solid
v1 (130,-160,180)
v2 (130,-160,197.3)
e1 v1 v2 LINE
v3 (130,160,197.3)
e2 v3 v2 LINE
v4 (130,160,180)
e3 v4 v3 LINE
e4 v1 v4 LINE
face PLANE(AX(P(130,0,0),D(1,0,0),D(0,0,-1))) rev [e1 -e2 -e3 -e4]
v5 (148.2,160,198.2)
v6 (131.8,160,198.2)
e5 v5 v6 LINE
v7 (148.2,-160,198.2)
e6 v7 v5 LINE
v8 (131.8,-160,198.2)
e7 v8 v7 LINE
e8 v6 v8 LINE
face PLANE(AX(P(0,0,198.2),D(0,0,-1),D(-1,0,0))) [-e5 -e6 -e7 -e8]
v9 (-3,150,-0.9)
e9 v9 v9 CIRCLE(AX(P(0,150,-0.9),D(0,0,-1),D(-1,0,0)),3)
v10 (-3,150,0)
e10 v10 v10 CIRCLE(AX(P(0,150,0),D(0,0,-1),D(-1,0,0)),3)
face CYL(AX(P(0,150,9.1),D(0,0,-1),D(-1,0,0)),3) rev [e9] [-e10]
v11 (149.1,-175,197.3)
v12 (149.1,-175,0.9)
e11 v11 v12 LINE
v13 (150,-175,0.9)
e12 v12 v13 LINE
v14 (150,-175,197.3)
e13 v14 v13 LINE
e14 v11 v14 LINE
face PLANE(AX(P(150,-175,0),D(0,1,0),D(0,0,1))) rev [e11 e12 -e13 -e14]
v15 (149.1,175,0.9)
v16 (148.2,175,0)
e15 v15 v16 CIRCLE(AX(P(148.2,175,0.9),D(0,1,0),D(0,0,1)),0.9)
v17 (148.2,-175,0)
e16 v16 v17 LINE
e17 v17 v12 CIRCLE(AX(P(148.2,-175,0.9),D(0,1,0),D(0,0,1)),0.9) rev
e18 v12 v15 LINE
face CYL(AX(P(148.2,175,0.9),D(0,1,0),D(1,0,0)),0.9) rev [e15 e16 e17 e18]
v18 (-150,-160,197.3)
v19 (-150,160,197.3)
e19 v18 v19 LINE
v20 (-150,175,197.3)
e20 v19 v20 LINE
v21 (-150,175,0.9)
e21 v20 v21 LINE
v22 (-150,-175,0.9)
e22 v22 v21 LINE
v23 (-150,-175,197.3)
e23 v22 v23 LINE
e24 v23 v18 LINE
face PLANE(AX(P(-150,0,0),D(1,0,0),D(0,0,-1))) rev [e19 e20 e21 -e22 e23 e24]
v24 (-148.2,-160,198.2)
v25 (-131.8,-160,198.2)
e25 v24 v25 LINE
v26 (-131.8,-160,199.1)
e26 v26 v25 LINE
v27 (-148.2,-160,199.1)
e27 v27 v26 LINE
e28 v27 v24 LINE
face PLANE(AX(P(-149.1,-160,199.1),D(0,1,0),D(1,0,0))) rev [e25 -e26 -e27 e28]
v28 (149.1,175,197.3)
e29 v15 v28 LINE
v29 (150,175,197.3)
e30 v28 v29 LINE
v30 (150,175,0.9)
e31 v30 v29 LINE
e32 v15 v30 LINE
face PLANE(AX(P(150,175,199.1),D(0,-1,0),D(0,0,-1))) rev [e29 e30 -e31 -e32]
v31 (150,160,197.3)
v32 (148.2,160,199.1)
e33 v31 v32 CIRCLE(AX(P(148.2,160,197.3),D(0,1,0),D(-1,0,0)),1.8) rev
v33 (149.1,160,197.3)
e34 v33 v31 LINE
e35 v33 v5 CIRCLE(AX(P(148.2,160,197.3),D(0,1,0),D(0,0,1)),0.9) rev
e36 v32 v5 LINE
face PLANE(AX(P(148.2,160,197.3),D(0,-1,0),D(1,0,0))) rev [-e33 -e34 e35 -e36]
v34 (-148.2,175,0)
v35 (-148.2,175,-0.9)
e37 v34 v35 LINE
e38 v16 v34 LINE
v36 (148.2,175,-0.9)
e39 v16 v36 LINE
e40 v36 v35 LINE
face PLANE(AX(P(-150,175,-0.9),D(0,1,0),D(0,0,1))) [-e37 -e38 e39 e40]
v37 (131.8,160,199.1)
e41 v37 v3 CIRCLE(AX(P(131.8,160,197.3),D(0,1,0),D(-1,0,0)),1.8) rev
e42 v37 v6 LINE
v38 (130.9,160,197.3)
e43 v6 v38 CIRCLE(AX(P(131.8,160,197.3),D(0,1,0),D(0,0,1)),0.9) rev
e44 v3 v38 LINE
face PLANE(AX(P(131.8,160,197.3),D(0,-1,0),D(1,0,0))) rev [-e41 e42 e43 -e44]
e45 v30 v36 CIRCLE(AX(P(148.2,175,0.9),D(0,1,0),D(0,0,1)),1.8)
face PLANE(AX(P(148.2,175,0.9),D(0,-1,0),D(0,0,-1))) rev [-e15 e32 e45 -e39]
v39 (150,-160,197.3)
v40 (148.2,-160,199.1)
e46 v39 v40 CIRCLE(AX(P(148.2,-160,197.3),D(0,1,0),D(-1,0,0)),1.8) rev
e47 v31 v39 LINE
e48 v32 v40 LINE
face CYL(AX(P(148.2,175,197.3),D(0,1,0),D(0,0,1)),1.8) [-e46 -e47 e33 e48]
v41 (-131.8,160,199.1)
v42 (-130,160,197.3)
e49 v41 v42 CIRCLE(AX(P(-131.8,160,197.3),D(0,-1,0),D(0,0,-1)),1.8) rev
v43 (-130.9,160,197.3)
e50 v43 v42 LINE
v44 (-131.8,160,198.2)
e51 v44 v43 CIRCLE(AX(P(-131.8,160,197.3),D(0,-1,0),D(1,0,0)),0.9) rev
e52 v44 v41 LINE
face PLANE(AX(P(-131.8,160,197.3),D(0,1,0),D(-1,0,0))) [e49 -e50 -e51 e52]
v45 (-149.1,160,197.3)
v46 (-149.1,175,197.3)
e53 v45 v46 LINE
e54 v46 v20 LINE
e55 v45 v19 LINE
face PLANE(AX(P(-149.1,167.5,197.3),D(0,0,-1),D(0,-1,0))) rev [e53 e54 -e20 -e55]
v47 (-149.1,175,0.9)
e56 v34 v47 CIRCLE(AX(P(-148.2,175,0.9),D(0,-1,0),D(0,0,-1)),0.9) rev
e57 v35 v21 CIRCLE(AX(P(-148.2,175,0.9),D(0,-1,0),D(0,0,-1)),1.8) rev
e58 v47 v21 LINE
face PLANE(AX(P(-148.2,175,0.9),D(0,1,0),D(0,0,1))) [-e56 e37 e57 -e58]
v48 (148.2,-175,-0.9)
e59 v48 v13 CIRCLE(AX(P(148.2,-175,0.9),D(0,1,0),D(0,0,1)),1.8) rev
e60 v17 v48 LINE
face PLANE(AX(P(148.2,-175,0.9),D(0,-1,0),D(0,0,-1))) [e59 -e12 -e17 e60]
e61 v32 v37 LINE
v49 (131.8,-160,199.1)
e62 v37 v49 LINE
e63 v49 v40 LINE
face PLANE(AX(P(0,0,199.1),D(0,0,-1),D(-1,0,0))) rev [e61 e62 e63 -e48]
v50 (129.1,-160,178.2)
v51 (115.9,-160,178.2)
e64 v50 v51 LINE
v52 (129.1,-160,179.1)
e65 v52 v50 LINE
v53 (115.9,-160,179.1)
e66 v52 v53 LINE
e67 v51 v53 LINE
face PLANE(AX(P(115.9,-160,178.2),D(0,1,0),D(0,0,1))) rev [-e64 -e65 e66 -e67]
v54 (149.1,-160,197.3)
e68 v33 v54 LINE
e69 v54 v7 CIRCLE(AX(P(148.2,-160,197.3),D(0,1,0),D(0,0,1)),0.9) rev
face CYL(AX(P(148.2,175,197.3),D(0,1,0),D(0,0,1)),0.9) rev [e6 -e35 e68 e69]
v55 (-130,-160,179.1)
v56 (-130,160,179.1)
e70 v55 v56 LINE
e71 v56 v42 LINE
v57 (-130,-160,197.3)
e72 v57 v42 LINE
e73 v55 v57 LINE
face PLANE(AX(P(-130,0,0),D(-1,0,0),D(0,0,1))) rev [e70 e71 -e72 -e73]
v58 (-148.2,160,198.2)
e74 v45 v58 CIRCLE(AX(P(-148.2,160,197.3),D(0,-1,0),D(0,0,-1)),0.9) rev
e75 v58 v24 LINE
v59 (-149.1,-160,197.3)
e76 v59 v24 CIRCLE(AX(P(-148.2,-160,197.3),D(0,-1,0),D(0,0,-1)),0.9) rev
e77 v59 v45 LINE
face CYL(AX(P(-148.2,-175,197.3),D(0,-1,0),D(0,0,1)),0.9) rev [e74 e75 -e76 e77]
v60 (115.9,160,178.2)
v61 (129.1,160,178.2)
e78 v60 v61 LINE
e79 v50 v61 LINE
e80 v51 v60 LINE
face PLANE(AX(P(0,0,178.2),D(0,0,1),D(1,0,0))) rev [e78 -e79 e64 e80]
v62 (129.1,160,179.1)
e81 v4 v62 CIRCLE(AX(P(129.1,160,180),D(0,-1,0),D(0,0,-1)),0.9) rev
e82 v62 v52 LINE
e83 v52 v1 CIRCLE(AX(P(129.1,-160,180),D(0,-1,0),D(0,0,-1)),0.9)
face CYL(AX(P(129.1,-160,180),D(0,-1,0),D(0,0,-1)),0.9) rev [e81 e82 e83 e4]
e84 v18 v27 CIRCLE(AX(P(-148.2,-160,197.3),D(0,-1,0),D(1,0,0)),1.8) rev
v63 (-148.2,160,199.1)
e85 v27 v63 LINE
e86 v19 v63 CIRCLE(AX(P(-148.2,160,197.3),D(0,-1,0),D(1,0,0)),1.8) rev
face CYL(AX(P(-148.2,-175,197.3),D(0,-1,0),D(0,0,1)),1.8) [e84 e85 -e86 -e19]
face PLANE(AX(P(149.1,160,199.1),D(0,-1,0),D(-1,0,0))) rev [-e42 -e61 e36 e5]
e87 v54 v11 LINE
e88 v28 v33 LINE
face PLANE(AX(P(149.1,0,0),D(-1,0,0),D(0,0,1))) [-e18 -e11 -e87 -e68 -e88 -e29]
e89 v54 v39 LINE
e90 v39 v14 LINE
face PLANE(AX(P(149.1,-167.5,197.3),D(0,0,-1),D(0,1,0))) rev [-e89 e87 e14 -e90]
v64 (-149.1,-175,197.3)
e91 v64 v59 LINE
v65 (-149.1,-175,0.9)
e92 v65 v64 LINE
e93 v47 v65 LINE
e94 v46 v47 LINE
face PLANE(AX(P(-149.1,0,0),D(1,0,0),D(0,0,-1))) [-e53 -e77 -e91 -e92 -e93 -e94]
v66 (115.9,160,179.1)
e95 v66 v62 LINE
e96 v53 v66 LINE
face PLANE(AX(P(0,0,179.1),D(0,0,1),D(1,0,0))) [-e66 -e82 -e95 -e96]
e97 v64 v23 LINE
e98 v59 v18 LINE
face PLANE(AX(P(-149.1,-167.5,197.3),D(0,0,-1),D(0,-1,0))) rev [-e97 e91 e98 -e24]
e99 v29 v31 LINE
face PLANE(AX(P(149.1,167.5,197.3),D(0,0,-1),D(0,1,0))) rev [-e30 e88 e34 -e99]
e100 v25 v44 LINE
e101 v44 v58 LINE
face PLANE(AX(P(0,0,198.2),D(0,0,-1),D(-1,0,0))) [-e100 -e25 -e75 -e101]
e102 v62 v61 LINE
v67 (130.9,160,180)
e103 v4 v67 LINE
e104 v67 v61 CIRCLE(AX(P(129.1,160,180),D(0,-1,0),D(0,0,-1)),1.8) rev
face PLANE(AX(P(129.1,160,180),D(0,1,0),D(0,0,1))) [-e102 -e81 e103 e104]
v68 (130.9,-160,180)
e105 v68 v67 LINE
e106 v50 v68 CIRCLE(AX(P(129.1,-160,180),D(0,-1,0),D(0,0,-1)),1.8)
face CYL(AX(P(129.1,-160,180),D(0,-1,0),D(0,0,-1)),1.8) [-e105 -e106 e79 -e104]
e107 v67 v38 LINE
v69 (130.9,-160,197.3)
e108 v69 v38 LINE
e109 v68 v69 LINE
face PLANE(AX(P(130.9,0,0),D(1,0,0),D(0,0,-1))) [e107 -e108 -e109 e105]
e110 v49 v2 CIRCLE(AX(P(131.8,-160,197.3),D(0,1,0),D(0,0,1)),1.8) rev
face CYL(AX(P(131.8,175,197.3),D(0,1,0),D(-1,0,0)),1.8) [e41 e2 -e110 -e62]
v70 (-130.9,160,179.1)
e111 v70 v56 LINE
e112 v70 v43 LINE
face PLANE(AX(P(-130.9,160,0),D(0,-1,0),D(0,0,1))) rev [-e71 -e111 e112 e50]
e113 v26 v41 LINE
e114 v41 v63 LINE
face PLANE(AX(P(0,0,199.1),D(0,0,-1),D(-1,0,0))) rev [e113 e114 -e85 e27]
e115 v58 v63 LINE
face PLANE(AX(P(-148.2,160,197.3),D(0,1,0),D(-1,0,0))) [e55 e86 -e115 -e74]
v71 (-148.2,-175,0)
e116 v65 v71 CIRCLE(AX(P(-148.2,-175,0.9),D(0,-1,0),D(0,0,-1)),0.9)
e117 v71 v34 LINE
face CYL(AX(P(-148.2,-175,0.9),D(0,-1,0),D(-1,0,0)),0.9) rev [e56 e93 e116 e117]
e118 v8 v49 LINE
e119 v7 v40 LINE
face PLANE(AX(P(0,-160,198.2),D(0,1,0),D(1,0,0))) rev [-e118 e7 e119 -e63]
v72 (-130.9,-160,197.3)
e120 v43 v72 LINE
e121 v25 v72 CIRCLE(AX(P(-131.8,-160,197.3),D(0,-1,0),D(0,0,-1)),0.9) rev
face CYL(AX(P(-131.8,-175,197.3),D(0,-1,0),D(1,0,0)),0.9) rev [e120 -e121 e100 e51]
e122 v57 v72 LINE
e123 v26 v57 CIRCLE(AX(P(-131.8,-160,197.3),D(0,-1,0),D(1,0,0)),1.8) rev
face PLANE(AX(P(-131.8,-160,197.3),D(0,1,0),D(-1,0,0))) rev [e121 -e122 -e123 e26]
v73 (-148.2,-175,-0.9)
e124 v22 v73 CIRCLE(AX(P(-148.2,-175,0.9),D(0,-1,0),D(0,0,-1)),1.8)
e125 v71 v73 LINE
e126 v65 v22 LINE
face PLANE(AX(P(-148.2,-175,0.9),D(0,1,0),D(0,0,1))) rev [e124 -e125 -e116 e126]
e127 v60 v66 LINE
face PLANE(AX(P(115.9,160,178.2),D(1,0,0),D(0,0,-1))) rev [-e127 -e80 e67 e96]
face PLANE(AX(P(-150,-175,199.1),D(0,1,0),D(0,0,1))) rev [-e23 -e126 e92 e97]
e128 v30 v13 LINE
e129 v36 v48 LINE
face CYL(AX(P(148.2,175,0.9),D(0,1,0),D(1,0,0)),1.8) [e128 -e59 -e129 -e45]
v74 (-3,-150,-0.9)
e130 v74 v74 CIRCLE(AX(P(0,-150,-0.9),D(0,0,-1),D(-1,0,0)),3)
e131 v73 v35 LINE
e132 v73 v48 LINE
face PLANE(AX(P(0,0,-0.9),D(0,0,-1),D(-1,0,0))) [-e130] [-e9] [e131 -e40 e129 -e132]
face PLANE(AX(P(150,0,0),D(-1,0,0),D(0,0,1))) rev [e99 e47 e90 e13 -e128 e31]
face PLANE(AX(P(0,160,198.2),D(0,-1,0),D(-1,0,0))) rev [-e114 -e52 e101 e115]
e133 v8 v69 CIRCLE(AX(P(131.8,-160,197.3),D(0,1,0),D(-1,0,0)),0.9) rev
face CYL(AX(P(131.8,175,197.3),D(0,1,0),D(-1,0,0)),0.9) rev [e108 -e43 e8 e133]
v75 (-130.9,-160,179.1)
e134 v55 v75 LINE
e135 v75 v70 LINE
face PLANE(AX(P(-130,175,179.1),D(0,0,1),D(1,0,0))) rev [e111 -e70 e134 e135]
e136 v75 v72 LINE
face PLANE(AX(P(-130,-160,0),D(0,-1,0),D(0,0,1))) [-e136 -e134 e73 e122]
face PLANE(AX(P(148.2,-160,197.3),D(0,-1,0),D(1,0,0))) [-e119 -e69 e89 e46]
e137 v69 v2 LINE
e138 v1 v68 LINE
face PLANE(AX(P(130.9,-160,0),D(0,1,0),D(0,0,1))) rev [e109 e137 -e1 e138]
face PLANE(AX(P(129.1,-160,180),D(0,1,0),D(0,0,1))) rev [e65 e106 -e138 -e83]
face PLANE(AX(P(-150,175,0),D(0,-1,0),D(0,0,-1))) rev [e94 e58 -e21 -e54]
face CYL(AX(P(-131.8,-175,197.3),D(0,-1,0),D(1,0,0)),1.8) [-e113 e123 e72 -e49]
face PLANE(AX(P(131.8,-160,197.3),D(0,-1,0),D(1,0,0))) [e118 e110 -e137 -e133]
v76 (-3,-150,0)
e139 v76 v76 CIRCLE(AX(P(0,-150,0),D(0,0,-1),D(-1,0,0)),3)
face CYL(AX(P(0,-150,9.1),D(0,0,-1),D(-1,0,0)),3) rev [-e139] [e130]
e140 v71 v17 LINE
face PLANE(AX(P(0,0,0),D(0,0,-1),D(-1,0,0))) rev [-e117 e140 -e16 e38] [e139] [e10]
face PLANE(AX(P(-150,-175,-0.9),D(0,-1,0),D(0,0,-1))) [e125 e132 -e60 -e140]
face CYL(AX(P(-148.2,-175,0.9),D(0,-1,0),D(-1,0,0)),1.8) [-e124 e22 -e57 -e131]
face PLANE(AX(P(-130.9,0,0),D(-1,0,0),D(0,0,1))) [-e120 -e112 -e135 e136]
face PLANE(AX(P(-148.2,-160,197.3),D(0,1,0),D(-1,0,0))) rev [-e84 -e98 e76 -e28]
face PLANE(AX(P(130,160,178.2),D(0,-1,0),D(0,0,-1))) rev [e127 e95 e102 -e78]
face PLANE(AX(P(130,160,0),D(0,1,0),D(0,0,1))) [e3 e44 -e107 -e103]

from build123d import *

# Parameters (mm, degrees)
SKETCH1_W                      = 300
SKETCH1_H                      = 350
BASE_FLANGE1_DEPTH             = 0.9
EDGE_FLANGE1_STRIP_W           = 5.4
EDGE_FLANGE1_STRIP_H           = 0.9
EDGE_FLANGE1_STRIP_CUT_DEPTH   = 350
EDGE_FLANGE1_STRIP_2_W         = 5.4
EDGE_FLANGE1_STRIP_2_H         = 0.9
EDGE_FLANGE1_STRIP_CUT_2_DEPTH = 350
EDGE_FLANGE1_DEPTH             = 350
EDGE_FLANGE1_BEND_DEPTH        = 350
EDGE_FLANGE2_STRIP_W           = 5.4
EDGE_FLANGE2_STRIP_H           = 0.9
EDGE_FLANGE2_STRIP_CUT_DEPTH   = 350
EDGE_FLANGE2_STRIP_2_W         = 5.4
EDGE_FLANGE2_STRIP_2_H         = 0.9
EDGE_FLANGE2_STRIP_CUT_2_DEPTH = 350
EDGE_FLANGE2_DEPTH             = 350
EDGE_FLANGE2_BEND_DEPTH        = 350
EDGE_FLANGE3_STRIP_W           = 5.4
EDGE_FLANGE3_STRIP_H           = 0.9
EDGE_FLANGE3_STRIP_CUT_DEPTH   = 350
EDGE_FLANGE3_STRIP_2_W         = 5.4
EDGE_FLANGE3_STRIP_2_H         = 0.9
EDGE_FLANGE3_STRIP_CUT_2_DEPTH = 350
EDGE_FLANGE3_DEPTH             = 350
EDGE_FLANGE3_BEND_DEPTH        = 350
CUT_EXTRUDE1_START             = 160
CUT_EXTRUDE1_DEPTH             = 15
MIRROR2_START                  = 160
MIRROR2_COPY_1_DEPTH           = 15
EDGE_FLANGE4_STRIP_W           = 5.4
EDGE_FLANGE4_STRIP_H           = 0.9
EDGE_FLANGE4_STRIP_CUT_DEPTH   = 320
EDGE_FLANGE4_DEPTH             = 320
SKETCH28_R                     = 3
CUT_EXTRUDE2_DEPTH             = 10


# Read off the part's stored shape, not the designer's step: Cut-Extrude1
# Sheet-metal steps are written as plain solids
with BuildPart() as part:
    # Sketch1 → Base-Flange1 (new body)
    with BuildSketch(Plane.XY):
        Rectangle(SKETCH1_W, SKETCH1_H)
    extrude(amount=-BASE_FLANGE1_DEPTH)

    # Edge-Flange1 strip (across the edge) → Edge-Flange1 strip cut (cut)
    with BuildSketch(Plane(origin=(-150, 175, 0), x_dir=(1, 0, 0), z_dir=(0, -1, 0))):
        with Locations((-0.9, -0.45)):
            Rectangle(EDGE_FLANGE1_STRIP_W, EDGE_FLANGE1_STRIP_H)
    extrude(amount=EDGE_FLANGE1_STRIP_CUT_DEPTH, mode=Mode.SUBTRACT)

    # Edge-Flange1 strip 2 (across the edge) → Edge-Flange1 strip cut 2 (cut)
    with BuildSketch(Plane(origin=(150, -175, 0), x_dir=(-1, 0, 0), z_dir=(0, 1, 0))):
        with Locations((-0.9, -0.45)):
            Rectangle(EDGE_FLANGE1_STRIP_2_W, EDGE_FLANGE1_STRIP_2_H)
    extrude(amount=EDGE_FLANGE1_STRIP_CUT_2_DEPTH, mode=Mode.SUBTRACT)

    # Edge-Flange1 section (across the edge) → Edge-Flange1 (add)
    with BuildSketch(Plane(origin=(-150, 175, 0), x_dir=(1, 0, 0), z_dir=(0, -1, 0))):
        with BuildLine():
            Line((0, 0.9), (0, 199.1))
            Line((0, 199.1), (0.9, 199.1))
            Line((0.9, 199.1), (0.9, 0.9))
            ThreePointArc((0.9, 0.9), (1.163603897, 0.263603897), (1.8, 0))
            Line((1.8, 0), (1.8, -0.9))
            ThreePointArc((1.8, -0.9), (0.527207794, -0.372792206), (0, 0.9))
        make_face()
    extrude(amount=EDGE_FLANGE1_DEPTH)

    # Edge-Flange1 section 2 (across the edge) → Edge-Flange1 bend (add)
    with BuildSketch(Plane(origin=(150, -175, 0), x_dir=(-1, 0, 0), z_dir=(0, 1, 0))):
        with BuildLine():
            Line((0, 0.9), (0, 199.1))
            Line((0, 199.1), (0.9, 199.1))
            Line((0.9, 199.1), (0.9, 0.9))
            ThreePointArc((0.9, 0.9), (1.163603897, 0.263603897), (1.8, 0))
            Line((1.8, 0), (1.8, -0.9))
            ThreePointArc((1.8, -0.9), (0.527207794, -0.372792206), (0, 0.9))
        make_face()
    extrude(amount=EDGE_FLANGE1_BEND_DEPTH)

    # Edge-Flange2 strip (across the edge) → Edge-Flange2 strip cut (cut)
    with BuildSketch(Plane(origin=(-149.1, 175, 199.1), x_dir=(0, 0, -1), z_dir=(0, -1, 0))):
        with Locations((-0.9, -0.45)):
            Rectangle(EDGE_FLANGE2_STRIP_W, EDGE_FLANGE2_STRIP_H)
    extrude(amount=EDGE_FLANGE2_STRIP_CUT_DEPTH, mode=Mode.SUBTRACT)

    # Edge-Flange2 strip 2 (across the edge) → Edge-Flange2 strip cut 2 (cut)
    with BuildSketch(Plane(origin=(149.1, -175, 199.1), x_dir=(0, 0, -1), z_dir=(0, 1, 0))):
        with Locations((-0.9, -0.45)):
            Rectangle(EDGE_FLANGE2_STRIP_2_W, EDGE_FLANGE2_STRIP_2_H)
    extrude(amount=EDGE_FLANGE2_STRIP_CUT_2_DEPTH, mode=Mode.SUBTRACT)

    # Edge-Flange2 section (across the edge) → Edge-Flange2 (add)
    with BuildSketch(Plane(origin=(-149.1, 175, 199.1), x_dir=(0, 0, -1), z_dir=(0, -1, 0))):
        with BuildLine():
            Line((0, 0.9), (0, 19.1))
            Line((0, 19.1), (0.9, 19.1))
            Line((0.9, 19.1), (0.9, 0.9))
            ThreePointArc((0.9, 0.9), (1.163603897, 0.263603897), (1.8, 0))
            Line((1.8, 0), (1.8, -0.9))
            ThreePointArc((1.8, -0.9), (0.527207794, -0.372792206), (0, 0.9))
        make_face()
    extrude(amount=EDGE_FLANGE2_DEPTH)

    # Edge-Flange2 section 2 (across the edge) → Edge-Flange2 bend (add)
    with BuildSketch(Plane(origin=(149.1, -175, 199.1), x_dir=(0, 0, -1), z_dir=(0, 1, 0))):
        with BuildLine():
            Line((0, 0.9), (0, 19.1))
            Line((0, 19.1), (0.9, 19.1))
            Line((0.9, 19.1), (0.9, 0.9))
            ThreePointArc((0.9, 0.9), (1.163603897, 0.263603897), (1.8, 0))
            Line((1.8, 0), (1.8, -0.9))
            ThreePointArc((1.8, -0.9), (0.527207794, -0.372792206), (0, 0.9))
        make_face()
    extrude(amount=EDGE_FLANGE2_BEND_DEPTH)

    # Edge-Flange3 strip (across the edge) → Edge-Flange3 strip cut (cut)
    with BuildSketch(Plane(origin=(130, -175, 198.2), x_dir=(1, 0, 0), z_dir=(0, 1, 0))):
        with Locations((-0.9, -0.45)):
            Rectangle(EDGE_FLANGE3_STRIP_W, EDGE_FLANGE3_STRIP_H)
    extrude(amount=EDGE_FLANGE3_STRIP_CUT_DEPTH, mode=Mode.SUBTRACT)

    # Edge-Flange3 strip 2 (across the edge) → Edge-Flange3 strip cut 2 (cut)
    with BuildSketch(Plane(origin=(-130, 175, 198.2), x_dir=(-1, 0, 0), z_dir=(0, -1, 0))):
        with Locations((-0.9, -0.45)):
            Rectangle(EDGE_FLANGE3_STRIP_2_W, EDGE_FLANGE3_STRIP_2_H)
    extrude(amount=EDGE_FLANGE3_STRIP_CUT_2_DEPTH, mode=Mode.SUBTRACT)

    # Edge-Flange3 section (across the edge) → Edge-Flange3 (add)
    with BuildSketch(Plane(origin=(130, -175, 198.2), x_dir=(1, 0, 0), z_dir=(0, 1, 0))):
        with BuildLine():
            Line((0, 0.9), (0, 19.1))
            Line((0, 19.1), (0.9, 19.1))
            Line((0.9, 19.1), (0.9, 0.9))
            ThreePointArc((0.9, 0.9), (1.163603897, 0.263603897), (1.8, 0))
            Line((1.8, 0), (1.8, -0.9))
            ThreePointArc((1.8, -0.9), (0.527207794, -0.372792206), (0, 0.9))
        make_face()
    extrude(amount=EDGE_FLANGE3_DEPTH)

    # Edge-Flange3 section 2 (across the edge) → Edge-Flange3 bend (add)
    with BuildSketch(Plane(origin=(-130, 175, 198.2), x_dir=(-1, 0, 0), z_dir=(0, -1, 0))):
        with BuildLine():
            Line((0, 0.9), (0, 19.1))
            Line((0, 19.1), (0.9, 19.1))
            Line((0.9, 19.1), (0.9, 0.9))
            ThreePointArc((0.9, 0.9), (1.163603897, 0.263603897), (1.8, 0))
            Line((1.8, 0), (1.8, -0.9))
            ThreePointArc((1.8, -0.9), (0.527207794, -0.372792206), (0, 0.9))
        make_face()
    extrude(amount=EDGE_FLANGE3_BEND_DEPTH)

    # Cut-Extrude1 outline → Cut-Extrude1 (cut)
    with BuildSketch(Plane(origin=(0, 0, 0), x_dir=(1, 0, 0), z_dir=(0, 1, 0)).offset(CUT_EXTRUDE1_START)):
        with BuildLine():
            ThreePointArc((-148.2, -198.2), (-148.836396103, -197.936396103), (-149.1, -197.3))
            Line((-149.1, -197.3), (-150, -197.3))
            ThreePointArc((-150, -197.3), (-149.472792206, -198.572792206), (-148.2, -199.1))
            Line((-148.2, -199.1), (-131.8, -199.1))
            ThreePointArc((-131.8, -199.1), (-130.527207794, -198.572792206), (-130, -197.3))
            Line((-130, -197.3), (-130, -179.1))
            Line((-130, -179.1), (-130.9, -179.1))
            Line((-130.9, -179.1), (-130.9, -197.3))
            ThreePointArc((-130.9, -197.3), (-131.163603897, -197.936396103), (-131.8, -198.2))
            Line((-131.8, -198.2), (-148.2, -198.2))
        make_face()
    cut_extrude1 = extrude(amount=CUT_EXTRUDE1_DEPTH, mode=Mode.SUBTRACT)

    # Mirror1: Cut-Extrude1 across plane
    add(cut_extrude1.mirror(Plane(origin=(0, 0, 0), x_dir=(0, 0, 1), z_dir=(1, 0, 0))), mode=Mode.SUBTRACT)

    # Mirror2: Cut-Extrude1 across plane
    add(cut_extrude1.mirror(Plane.ZX), mode=Mode.SUBTRACT)

    # Mirror2 copy 1 sketch → Mirror2 copy 1 (cut)
    with BuildSketch(Plane(origin=(0, 0, 0), x_dir=(-1, 0, 0), z_dir=(0, -1, 0)).offset(MIRROR2_START)):
        with BuildLine():
            ThreePointArc((-148.2, -198.2), (-148.836396103, -197.936396103), (-149.1, -197.3))
            Line((-149.1, -197.3), (-150, -197.3))
            ThreePointArc((-150, -197.3), (-149.472792206, -198.572792206), (-148.2, -199.1))
            Line((-148.2, -199.1), (-131.8, -199.1))
            ThreePointArc((-131.8, -199.1), (-130.527207794, -198.572792206), (-130, -197.3))
            Line((-130, -197.3), (-130, -179.1))
            Line((-130, -179.1), (-130.9, -179.1))
            Line((-130.9, -179.1), (-130.9, -197.3))
            ThreePointArc((-130.9, -197.3), (-131.163603897, -197.936396103), (-131.8, -198.2))
            Line((-131.8, -198.2), (-148.2, -198.2))
        make_face()
    extrude(amount=MIRROR2_COPY_1_DEPTH, mode=Mode.SUBTRACT)

    # Edge-Flange4 strip (across the edge) → Edge-Flange4 strip cut (cut)
    with BuildSketch(Plane(origin=(130, 160, 179.1), x_dir=(0, 0, 1), z_dir=(0, -1, 0))):
        with Locations((-1.8, -0.45)):
            Rectangle(EDGE_FLANGE4_STRIP_W, EDGE_FLANGE4_STRIP_H)
    extrude(amount=EDGE_FLANGE4_STRIP_CUT_DEPTH, mode=Mode.SUBTRACT)

    # Edge-Flange4 section (across the edge) → Edge-Flange4 (add)
    with BuildSketch(Plane(origin=(130, 160, 179.1), x_dir=(0, 0, 1), z_dir=(0, -1, 0))):
        with BuildLine():
            Line((-0.9, 0.9), (-0.9, 14.1))
            Line((-0.9, 14.1), (0, 14.1))
            Line((0, 14.1), (0, 0.9))
            ThreePointArc((0, 0.9), (0.263603897, 0.263603897), (0.9, 0))
            Line((0.9, 0), (0.9, -0.9))
            ThreePointArc((0.9, -0.9), (-0.372792206, -0.372792206), (-0.9, 0.9))
        make_face()
    extrude(amount=EDGE_FLANGE4_DEPTH)

    # Sketch28 → Cut-Extrude2 (cut)
    with BuildSketch(Plane(origin=(0, 0, -0.9), x_dir=(-1, 0, 0), z_dir=(0, 0, -1))):
        with Locations((0, 150)):
            Circle(SKETCH28_R)
        with Locations((0, -150)):
            Circle(SKETCH28_R)
    extrude(amount=-CUT_EXTRUDE2_DEPTH, mode=Mode.SUBTRACT)


solid = part.part
